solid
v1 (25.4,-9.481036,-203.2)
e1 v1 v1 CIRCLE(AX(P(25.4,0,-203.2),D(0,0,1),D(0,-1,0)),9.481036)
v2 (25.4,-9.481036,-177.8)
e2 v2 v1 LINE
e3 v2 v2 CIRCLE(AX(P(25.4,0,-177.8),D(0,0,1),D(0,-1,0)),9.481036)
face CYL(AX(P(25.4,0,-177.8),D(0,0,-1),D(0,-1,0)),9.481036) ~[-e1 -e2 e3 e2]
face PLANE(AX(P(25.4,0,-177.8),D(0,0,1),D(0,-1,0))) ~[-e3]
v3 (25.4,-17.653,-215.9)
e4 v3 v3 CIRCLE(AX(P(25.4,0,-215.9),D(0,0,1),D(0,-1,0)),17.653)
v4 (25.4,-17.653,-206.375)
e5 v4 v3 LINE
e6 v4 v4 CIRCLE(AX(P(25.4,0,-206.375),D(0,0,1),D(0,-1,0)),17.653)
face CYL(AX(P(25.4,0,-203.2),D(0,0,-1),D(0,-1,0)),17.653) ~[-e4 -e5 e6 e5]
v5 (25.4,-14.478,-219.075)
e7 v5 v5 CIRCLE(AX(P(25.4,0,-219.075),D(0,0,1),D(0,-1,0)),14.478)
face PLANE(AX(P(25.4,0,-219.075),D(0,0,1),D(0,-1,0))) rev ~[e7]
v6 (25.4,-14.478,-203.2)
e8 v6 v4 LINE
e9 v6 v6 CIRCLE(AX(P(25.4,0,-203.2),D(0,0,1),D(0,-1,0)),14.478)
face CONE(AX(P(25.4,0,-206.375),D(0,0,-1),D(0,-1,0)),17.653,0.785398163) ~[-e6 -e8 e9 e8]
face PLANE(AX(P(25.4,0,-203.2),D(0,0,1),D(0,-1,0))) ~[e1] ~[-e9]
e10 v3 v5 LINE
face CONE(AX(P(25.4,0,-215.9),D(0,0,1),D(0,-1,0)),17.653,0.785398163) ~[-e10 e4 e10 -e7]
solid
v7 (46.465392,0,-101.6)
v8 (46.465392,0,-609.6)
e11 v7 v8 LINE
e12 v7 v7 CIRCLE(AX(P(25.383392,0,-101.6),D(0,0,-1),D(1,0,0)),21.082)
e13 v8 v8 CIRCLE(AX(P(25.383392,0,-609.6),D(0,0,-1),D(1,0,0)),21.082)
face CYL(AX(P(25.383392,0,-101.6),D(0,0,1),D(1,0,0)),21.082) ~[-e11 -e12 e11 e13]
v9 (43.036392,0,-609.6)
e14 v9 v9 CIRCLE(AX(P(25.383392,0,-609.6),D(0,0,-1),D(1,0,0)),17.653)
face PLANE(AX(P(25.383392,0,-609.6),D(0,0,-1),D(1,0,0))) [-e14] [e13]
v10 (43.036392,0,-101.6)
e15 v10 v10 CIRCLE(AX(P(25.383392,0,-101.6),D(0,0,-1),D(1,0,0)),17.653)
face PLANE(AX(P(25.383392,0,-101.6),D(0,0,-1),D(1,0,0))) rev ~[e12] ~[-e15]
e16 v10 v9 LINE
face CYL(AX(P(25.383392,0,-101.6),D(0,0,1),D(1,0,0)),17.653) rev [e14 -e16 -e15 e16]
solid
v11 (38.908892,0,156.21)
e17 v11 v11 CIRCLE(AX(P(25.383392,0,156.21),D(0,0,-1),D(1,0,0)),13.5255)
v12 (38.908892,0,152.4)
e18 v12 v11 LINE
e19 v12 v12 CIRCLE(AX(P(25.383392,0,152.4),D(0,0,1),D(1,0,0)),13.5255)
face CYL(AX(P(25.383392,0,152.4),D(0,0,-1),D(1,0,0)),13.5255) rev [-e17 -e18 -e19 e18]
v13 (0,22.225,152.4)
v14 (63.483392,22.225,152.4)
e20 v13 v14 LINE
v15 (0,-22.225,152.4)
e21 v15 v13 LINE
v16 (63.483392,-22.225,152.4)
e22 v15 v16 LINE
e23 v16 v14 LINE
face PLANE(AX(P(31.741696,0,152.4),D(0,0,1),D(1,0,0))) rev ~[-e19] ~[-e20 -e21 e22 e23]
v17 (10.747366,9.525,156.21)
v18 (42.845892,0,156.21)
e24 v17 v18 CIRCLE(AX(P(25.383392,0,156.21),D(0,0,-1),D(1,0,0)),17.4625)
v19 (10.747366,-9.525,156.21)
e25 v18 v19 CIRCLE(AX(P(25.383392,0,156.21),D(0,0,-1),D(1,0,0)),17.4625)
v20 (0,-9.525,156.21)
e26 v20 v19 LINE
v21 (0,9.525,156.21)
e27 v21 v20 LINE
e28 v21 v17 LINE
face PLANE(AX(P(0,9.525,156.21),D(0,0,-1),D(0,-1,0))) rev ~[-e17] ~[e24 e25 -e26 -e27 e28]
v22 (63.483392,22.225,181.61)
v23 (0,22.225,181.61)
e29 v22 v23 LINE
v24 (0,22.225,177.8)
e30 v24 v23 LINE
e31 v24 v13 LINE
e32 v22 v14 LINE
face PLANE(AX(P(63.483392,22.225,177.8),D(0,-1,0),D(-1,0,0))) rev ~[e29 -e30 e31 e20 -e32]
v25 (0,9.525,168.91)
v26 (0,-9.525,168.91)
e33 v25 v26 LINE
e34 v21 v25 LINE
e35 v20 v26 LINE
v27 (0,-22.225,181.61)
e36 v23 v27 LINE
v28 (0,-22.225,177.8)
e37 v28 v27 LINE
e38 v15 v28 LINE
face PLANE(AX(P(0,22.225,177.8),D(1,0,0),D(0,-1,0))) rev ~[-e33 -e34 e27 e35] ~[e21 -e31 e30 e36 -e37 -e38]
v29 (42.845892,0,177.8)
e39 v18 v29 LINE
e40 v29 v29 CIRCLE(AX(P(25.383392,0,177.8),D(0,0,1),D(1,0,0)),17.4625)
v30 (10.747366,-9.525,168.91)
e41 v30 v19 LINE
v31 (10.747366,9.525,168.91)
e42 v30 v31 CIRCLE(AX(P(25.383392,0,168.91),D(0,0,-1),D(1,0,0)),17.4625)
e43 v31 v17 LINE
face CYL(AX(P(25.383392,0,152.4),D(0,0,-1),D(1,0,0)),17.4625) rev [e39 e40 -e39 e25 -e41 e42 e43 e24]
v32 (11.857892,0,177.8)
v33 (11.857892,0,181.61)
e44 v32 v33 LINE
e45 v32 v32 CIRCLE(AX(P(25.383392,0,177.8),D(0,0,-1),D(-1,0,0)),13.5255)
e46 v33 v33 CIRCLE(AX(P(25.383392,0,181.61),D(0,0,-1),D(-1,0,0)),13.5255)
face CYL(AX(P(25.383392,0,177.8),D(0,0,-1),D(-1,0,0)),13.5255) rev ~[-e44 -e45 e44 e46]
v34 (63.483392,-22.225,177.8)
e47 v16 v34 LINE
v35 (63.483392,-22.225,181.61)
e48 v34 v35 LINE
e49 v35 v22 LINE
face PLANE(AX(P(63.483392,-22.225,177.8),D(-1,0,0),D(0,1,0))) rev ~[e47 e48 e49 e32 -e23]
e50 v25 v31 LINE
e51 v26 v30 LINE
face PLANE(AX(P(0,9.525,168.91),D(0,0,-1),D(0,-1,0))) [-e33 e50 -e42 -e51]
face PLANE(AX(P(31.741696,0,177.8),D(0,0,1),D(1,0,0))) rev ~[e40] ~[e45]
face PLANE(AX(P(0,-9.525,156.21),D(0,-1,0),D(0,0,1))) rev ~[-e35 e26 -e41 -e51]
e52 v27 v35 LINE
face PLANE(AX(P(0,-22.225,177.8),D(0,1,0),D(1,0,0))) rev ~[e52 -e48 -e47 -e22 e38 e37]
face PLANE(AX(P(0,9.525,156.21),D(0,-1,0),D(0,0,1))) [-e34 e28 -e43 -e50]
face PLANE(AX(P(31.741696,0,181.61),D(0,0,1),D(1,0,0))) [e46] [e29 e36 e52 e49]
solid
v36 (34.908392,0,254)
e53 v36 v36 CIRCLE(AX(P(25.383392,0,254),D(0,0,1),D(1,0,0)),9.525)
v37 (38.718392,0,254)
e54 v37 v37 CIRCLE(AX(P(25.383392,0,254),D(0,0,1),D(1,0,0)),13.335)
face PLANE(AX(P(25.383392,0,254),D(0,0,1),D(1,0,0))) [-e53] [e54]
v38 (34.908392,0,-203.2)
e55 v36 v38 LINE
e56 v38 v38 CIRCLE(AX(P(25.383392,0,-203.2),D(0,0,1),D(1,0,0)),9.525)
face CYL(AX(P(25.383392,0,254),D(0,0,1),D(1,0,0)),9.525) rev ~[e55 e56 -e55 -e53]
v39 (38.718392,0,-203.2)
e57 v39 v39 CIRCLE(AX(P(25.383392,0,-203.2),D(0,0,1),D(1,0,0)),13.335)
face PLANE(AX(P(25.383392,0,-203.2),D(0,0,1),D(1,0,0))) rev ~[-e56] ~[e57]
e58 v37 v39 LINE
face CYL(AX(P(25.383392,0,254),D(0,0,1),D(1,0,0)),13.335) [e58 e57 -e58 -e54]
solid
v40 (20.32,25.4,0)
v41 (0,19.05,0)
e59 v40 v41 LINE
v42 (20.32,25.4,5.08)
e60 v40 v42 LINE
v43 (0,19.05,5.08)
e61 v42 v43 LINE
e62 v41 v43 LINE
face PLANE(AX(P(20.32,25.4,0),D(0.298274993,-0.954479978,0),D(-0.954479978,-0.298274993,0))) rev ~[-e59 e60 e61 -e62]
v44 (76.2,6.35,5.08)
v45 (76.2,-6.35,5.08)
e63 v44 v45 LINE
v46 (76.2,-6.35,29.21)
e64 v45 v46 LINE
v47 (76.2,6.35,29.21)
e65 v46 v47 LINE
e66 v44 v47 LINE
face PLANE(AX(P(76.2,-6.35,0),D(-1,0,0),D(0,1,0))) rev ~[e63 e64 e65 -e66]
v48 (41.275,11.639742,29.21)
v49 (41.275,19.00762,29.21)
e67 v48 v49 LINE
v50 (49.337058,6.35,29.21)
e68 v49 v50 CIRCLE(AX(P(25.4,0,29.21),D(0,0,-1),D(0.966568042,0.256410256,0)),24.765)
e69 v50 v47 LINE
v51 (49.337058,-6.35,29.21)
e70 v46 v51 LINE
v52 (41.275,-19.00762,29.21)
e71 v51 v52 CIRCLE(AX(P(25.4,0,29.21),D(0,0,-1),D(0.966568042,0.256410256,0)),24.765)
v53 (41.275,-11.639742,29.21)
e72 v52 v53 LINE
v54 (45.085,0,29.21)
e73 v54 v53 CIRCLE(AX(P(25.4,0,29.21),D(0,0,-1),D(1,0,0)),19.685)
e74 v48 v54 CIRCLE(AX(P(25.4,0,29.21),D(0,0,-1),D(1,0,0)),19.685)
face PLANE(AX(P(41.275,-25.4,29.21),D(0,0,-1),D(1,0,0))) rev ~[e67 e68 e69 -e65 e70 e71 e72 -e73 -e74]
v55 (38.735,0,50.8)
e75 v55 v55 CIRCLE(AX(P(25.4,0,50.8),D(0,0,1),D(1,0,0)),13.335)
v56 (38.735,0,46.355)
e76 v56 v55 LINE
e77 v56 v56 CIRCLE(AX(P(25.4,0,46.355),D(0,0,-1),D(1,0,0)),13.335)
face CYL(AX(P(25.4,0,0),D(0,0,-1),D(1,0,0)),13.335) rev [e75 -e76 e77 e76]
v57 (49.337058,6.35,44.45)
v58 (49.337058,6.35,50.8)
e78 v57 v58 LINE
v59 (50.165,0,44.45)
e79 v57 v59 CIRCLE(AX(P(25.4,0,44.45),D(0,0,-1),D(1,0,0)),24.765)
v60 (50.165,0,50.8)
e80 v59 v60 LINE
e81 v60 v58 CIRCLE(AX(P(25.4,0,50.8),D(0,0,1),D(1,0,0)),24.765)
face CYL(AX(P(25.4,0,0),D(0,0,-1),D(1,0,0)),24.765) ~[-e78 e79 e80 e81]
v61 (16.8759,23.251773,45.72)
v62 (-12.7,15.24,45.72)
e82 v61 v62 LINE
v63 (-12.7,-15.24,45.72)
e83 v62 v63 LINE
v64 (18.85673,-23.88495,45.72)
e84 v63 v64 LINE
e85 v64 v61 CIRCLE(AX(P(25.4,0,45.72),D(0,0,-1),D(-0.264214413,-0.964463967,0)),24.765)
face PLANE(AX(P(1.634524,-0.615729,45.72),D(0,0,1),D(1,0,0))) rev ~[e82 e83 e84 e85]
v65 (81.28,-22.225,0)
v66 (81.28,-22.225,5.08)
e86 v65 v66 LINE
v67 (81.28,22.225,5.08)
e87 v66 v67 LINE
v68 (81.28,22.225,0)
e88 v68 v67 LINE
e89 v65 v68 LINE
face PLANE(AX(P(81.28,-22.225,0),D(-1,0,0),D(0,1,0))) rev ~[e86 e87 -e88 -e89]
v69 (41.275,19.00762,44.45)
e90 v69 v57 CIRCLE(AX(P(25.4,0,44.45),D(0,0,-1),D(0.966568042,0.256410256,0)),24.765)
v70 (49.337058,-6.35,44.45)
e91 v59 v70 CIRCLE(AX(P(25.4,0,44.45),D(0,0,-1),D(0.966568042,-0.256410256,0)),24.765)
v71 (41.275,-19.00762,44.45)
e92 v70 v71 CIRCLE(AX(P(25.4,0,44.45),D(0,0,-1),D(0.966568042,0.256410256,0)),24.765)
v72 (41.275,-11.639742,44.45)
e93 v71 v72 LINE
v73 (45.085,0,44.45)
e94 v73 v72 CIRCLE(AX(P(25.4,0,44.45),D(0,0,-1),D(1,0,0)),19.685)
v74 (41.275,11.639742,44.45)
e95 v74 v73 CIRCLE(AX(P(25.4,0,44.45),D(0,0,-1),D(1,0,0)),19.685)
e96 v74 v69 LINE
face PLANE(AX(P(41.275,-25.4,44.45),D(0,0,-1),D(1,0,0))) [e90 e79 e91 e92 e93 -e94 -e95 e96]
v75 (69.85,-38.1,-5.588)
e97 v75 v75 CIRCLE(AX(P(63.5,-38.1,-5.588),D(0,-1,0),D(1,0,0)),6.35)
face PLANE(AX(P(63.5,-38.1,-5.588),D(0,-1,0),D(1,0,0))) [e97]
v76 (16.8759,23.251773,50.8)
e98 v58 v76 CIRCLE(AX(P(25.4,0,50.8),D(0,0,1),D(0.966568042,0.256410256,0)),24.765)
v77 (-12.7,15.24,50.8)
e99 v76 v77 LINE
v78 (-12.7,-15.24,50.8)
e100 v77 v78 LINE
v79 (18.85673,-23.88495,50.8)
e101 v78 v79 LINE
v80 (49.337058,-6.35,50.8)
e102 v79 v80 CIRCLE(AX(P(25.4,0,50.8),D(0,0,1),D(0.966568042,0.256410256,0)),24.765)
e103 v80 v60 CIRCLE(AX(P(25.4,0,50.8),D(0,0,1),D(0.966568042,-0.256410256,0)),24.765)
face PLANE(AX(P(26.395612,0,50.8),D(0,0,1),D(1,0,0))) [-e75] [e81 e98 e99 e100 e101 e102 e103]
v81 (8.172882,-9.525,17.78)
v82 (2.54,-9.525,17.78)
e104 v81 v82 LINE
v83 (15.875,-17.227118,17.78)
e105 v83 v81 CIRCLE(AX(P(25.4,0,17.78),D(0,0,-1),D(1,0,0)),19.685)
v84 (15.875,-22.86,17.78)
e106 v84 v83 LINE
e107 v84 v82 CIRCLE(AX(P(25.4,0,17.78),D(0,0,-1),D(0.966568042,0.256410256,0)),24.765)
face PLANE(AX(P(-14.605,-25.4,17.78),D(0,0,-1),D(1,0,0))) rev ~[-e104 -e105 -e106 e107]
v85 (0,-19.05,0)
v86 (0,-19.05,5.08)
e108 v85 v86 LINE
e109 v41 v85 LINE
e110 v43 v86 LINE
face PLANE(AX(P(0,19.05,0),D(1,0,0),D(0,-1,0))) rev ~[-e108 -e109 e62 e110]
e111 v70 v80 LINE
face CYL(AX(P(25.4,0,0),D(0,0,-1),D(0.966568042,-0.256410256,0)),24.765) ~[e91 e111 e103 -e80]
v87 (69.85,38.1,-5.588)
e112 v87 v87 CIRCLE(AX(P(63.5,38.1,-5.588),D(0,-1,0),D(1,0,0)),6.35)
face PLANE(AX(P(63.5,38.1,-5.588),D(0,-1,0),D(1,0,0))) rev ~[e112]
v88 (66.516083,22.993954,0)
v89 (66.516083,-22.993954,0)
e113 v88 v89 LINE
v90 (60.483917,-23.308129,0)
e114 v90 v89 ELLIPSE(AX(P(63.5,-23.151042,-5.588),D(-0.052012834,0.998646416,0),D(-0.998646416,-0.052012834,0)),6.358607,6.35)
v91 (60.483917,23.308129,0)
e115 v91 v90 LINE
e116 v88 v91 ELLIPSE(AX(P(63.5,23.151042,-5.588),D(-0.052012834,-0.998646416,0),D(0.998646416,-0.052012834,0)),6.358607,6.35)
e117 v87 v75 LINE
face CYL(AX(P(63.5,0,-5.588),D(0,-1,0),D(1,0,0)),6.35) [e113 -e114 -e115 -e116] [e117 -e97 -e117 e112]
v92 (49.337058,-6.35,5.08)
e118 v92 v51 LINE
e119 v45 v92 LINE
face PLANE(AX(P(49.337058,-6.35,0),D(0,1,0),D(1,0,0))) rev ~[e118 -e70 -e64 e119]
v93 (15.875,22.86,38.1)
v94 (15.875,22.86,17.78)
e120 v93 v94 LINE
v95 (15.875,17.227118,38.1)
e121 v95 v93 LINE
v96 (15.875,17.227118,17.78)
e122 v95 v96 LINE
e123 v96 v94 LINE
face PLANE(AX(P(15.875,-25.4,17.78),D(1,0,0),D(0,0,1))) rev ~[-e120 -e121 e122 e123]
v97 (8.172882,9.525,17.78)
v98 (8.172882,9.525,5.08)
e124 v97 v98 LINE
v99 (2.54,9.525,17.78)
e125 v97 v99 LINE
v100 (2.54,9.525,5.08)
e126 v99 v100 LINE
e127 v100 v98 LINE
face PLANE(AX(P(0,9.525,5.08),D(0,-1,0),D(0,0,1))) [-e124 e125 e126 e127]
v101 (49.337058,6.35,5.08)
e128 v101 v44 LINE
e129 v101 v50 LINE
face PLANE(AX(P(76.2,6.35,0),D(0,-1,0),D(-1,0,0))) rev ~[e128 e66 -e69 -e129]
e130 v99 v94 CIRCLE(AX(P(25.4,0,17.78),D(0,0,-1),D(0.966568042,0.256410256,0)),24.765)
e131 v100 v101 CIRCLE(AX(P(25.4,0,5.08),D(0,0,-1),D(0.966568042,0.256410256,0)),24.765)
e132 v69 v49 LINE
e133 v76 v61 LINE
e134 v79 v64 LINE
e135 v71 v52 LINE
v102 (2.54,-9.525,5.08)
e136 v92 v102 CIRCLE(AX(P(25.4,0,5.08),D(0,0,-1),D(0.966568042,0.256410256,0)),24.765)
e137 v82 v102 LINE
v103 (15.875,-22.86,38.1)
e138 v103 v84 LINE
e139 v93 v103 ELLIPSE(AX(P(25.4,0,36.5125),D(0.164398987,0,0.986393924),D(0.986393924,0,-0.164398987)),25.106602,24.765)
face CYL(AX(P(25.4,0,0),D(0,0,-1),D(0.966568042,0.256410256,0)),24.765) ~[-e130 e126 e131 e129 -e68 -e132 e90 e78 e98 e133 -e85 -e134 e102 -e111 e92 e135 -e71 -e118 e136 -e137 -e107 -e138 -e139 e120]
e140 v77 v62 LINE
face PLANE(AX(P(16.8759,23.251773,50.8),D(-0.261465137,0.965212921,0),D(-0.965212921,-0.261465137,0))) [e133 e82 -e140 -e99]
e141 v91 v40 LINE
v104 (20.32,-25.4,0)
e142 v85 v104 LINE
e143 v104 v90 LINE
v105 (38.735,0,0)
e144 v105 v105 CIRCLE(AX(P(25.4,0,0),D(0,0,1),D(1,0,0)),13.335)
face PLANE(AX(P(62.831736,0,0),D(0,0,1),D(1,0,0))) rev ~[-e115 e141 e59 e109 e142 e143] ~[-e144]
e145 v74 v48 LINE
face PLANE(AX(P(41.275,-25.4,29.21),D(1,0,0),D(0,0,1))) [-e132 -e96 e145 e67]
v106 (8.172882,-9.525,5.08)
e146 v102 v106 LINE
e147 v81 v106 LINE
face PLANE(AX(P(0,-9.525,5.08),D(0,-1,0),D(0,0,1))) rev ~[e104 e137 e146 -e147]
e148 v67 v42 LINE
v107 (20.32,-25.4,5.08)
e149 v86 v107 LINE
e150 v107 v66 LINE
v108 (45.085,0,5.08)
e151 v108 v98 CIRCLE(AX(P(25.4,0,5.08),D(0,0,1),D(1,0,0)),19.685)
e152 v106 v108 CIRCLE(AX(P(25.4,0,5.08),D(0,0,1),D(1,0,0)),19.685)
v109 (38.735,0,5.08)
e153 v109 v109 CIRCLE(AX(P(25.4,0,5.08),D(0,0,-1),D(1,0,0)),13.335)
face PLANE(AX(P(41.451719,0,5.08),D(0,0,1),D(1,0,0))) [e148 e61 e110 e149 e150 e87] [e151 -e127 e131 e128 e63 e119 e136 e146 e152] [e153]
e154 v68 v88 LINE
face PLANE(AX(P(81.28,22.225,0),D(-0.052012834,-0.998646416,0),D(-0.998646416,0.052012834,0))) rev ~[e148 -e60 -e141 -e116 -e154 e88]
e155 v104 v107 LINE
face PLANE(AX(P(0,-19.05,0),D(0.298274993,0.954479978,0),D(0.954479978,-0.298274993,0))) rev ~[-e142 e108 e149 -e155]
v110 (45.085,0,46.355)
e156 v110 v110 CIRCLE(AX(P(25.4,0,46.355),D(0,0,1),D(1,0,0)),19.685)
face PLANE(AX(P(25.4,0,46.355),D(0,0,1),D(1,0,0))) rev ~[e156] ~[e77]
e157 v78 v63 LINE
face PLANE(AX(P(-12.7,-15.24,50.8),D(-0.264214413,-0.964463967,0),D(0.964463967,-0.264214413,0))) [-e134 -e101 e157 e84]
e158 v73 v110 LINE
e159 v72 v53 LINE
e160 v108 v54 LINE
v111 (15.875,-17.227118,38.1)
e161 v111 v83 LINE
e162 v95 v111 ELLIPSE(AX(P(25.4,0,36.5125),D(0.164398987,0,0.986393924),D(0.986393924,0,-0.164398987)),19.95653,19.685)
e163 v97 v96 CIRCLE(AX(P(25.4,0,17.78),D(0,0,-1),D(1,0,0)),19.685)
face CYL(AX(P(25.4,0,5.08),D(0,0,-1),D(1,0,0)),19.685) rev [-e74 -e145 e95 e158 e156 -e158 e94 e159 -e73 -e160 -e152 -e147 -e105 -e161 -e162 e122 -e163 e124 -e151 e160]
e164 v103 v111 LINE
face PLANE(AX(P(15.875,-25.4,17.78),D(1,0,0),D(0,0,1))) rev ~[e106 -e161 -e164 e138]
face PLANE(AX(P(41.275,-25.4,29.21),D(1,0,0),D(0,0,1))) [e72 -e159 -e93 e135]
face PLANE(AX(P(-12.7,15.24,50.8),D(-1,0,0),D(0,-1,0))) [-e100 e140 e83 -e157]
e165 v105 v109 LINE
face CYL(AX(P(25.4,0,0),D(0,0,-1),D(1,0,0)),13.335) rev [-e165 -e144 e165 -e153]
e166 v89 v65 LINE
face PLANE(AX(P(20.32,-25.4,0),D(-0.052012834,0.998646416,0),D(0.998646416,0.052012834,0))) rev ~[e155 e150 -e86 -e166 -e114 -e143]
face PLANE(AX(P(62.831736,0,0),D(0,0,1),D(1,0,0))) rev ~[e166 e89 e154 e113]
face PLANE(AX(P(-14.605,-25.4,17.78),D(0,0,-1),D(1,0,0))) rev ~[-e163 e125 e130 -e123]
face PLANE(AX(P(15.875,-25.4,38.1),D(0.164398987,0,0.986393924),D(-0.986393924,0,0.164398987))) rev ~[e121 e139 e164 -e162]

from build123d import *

# Parameters (mm, degrees)
F0_R      = 13.335
F1_DEPTH  = 5.08
F2_DEPTH  = 50.8
F3_DEPTH  = 29.21
F5_DEPTH  = 5.08
F6_R      = 19.685
F7_DEPTH  = 41.275
F9_R      = 13.335
F9_R_2    = 9.525
F10_DEPTH = 457.2
F12_W     = 26.8629424323
F12_H     = 15.24
F13_DEPTH = 50.801
F14_R     = 6.35
F15_DEPTH = 38.1
F16_R     = 7.925577889
F16_R_2   = 6.35
F17_DEPTH = 12.7
F18_W     = 19.05
F18_H     = 19.05
F19_DEPTH = 25.4
F21_R     = 21.082
F21_R_2   = 17.653
F22_DEPTH = 508
F26_SIZE  = 3.175
F28_W     = 63.4833923489
F28_H     = 44.45
F28_R     = 17.4625
F28_R_2   = 13.5255
F29_DEPTH = 3.81
F30_DEPTH = 25.4
F32_DEPTH = 3.81
F33_W     = 19.05
F33_H     = 12.7
F34_DEPTH = 25.4


with BuildPart() as f1:
    # F0 (on Top) → F1 (new body)
    with BuildSketch(Plane.XY):
        Polygon((20.32, 25.4), (0, 19.05), (0, -19.05), (20.32, -25.4), (81.28, -22.225), (81.28, 22.225), align=None)
        with BuildLine():
            ThreePointArc((49.3370575677, -6.35), (0.635, 0), (49.3370575677, 6.35))
            Line((49.3370575677, 6.35), (76.2, 6.35))
            Line((76.2, 6.35), (76.2, -6.35))
            Line((76.2, -6.35), (49.3370575677, -6.35))
        make_face(mode=Mode.SUBTRACT)
        with BuildLine():
            ThreePointArc((49.3370575677, 6.35), (49.9571420941, 3.2018740087), (50.165, 0))
            ThreePointArc((50.165, 0), (49.9571420941, -3.2018740087), (49.3370575677, -6.35))
            Line((49.3370575677, -6.35), (76.2, -6.35))
            Line((76.2, -6.35), (76.2, 6.35))
            Line((76.2, 6.35), (49.3370575677, 6.35))
        make_face()
        with BuildLine():
            ThreePointArc((49.3370575677, -6.35), (49.9571420941, -3.2018740087), (50.165, 0))
            ThreePointArc((50.165, 0), (49.9571420941, 3.2018740087), (49.3370575677, 6.35))
            ThreePointArc((49.3370575677, 6.35), (0.635, 0), (49.3370575677, -6.35))
        make_face()
        with Locations((25.4, 0)):
            Circle(F0_R, mode=Mode.SUBTRACT)
    extrude(amount=F1_DEPTH)

    # F0 (on Top) → F2 (join)
    with BuildSketch(Plane.XY):
        with BuildLine():
            ThreePointArc((49.3370575677, -6.35), (49.9571420941, -3.2018740087), (50.165, 0))
            ThreePointArc((50.165, 0), (49.9571420941, 3.2018740087), (49.3370575677, 6.35))
            ThreePointArc((49.3370575677, 6.35), (0.635, 0), (49.3370575677, -6.35))
        make_face()
        with Locations((25.4, 0)):
            Circle(F0_R, mode=Mode.SUBTRACT)
    extrude(amount=F2_DEPTH)

    # F0 (on Top) → F3 (join)
    with BuildSketch(Plane.XY):
        with BuildLine():
            ThreePointArc((49.3370575677, 6.35), (49.9571420941, 3.2018740087), (50.165, 0))
            ThreePointArc((50.165, 0), (49.9571420941, -3.2018740087), (49.3370575677, -6.35))
            Line((49.3370575677, -6.35), (76.2, -6.35))
            Line((76.2, -6.35), (76.2, 6.35))
            Line((76.2, 6.35), (49.3370575677, 6.35))
        make_face()
    extrude(amount=F3_DEPTH)

    # F4 (on face) → F5 (join)
    with BuildSketch(Plane.XY.offset(50.8)):
        with BuildLine():
            ThreePointArc((18.8567300583, -23.8849501459), (0.6568378159, -1.0397836945), (16.8759001326, 23.2517729743))
            Line((16.8759001326, 23.2517729743), (-12.7, 15.24))
            Line((-12.7, 15.24), (-12.7, -15.24))
            Line((-12.7, -15.24), (18.8567300583, -23.8849501459))
        make_face()
    extrude(amount=-F5_DEPTH)

    # F6 (on face) → F7 (cut)
    with BuildSketch(Plane.XY.offset(5.08)):
        with Locations((25.4, 0)):
            Circle(F6_R)
    extrude(amount=F7_DEPTH, mode=Mode.SUBTRACT)

    # F12 (on offset) → F13 (cut, through all)
    with BuildSketch(Plane.XZ.offset(25.4)):
        Polygon((-14.605, 43.18), (-14.605, 17.78), (15.875, 17.78), (15.875, 38.1), align=None)
        with Locations((54.7064712161, 36.83)):
            Rectangle(F12_W, F12_H)
    extrude(amount=-F13_DEPTH, mode=Mode.SUBTRACT)

    # F14 (on Front) → F15 (join, symmetric)
    with BuildSketch(Plane.XZ):
        with Locations((63.5, -5.588)):
            Circle(F14_R)
    extrude(amount=F15_DEPTH, both=True)

    # F16 (on face) → F17 (cut)
    with BuildSketch(Plane.XZ.offset(38.1)):
        with Locations((63.5, -5.588)):
            Circle(F16_R)
        with Locations((63.5, -5.588)):
            Circle(F16_R_2, mode=Mode.SUBTRACT)
    extrude(amount=-F17_DEPTH, mode=Mode.SUBTRACT)

    # F18 (on Right) → F19 (cut)
    with BuildSketch(Plane.YZ):
        with Locations((0, 14.605)):
            Rectangle(F18_W, F18_H)
    extrude(amount=F19_DEPTH, mode=Mode.SUBTRACT)


with BuildPart() as f10:
    # F9 (on offset) → F10 (new body)
    with BuildSketch(Plane.XY.offset(254)):
        with Locations((25.3833923489, 0)):
            Circle(F9_R)
        with Locations((25.3833923489, 0)):
            Circle(F9_R_2, mode=Mode.SUBTRACT)
    extrude(amount=-F10_DEPTH)


with BuildPart() as f22:
    # F21 (on offset) → F22 (new body)
    with BuildSketch(Plane(origin=(0, 0, -101.6), x_dir=(1, 0, 0), z_dir=(0, 0, -1))):
        with Locations((25.3833923489, 0)):
            Circle(F21_R)
        with Locations((25.3833923489, 0)):
            Circle(F21_R_2, mode=Mode.SUBTRACT)
    extrude(amount=F22_DEPTH)


with BuildPart() as f25:
    # F24 (on plane+point) → F25 (revolve)
    with BuildSketch(Plane.YZ.offset(25.4)):
        Polygon((0, -177.8), (-9.4810361043, -177.8), (-9.4810361043, -203.2), (-17.653, -203.2), (-17.653, -219.075), (0, -219.075), align=None)
    revolve(axis=Axis((25.4, 0, -198.4375), (0, 0, 1)))

    # F26
    f26_edges = [f25.edges().sort_by_distance(p)[0] for p in [
        (25.4, 17.653, -219.075),
        (25.4, 17.653, -203.2),
    ]]
    chamfer(f26_edges, length=F26_SIZE)


with BuildPart() as f29:
    # F28 (on offset) → F29 (new body)
    with BuildSketch(Plane.XY.offset(152.4)):
        with Locations((31.7416961744, 0)):
            Rectangle(F28_W, F28_H)
        with Locations((25.3833923489, 0)):
            Circle(F28_R, mode=Mode.SUBTRACT)
        with Locations((25.3833923489, 0)):
            Circle(F28_R)
        with Locations((25.3833923489, 0)):
            Circle(F28_R_2, mode=Mode.SUBTRACT)
    extrude(amount=F29_DEPTH)

    # F28 (on offset) → F30 (join)
    with BuildSketch(Plane.XY.offset(152.4)):
        with Locations((31.7416961744, 0)):
            Rectangle(F28_W, F28_H)
        with Locations((25.3833923489, 0)):
            Circle(F28_R, mode=Mode.SUBTRACT)
    extrude(amount=F30_DEPTH)

    # F31 (on face) → F32 (join)
    with BuildSketch(Plane.XY.offset(177.8)):
        Polygon((63.4833923489, 22.225), (0, 22.225), (0, 0), (0, -22.225), (63.4833923489, -22.225), align=None)
        with BuildLine():
            ThreePointArc((42.8458923489, 0), (25.3833923489, -17.4625), (7.9208923489, 0))
            ThreePointArc((7.9208923489, 0), (25.3833923489, 17.4625), (42.8458923489, 0))
        make_face(mode=Mode.SUBTRACT)
        with BuildLine():
            ThreePointArc((42.8458923489, 0), (25.3833923489, 17.4625), (7.9208923489, 0))
            ThreePointArc((7.9208923489, 0), (25.3833923489, -17.4625), (42.8458923489, 0))
        make_face()
        with BuildLine():
            ThreePointArc((38.9088923489, 0), (25.3833923489, -13.5255), (11.8578923489, 0))
            ThreePointArc((11.8578923489, 0), (25.3833923489, 13.5255), (38.9088923489, 0))
        make_face(mode=Mode.SUBTRACT)
    extrude(amount=F32_DEPTH)

    # F33 (on face) → F34 (cut)
    with BuildSketch(Plane(origin=(0, 0, 0), x_dir=(0, -1, 0), z_dir=(-1, 0, 0))):
        with Locations((0, 162.56)):
            Rectangle(F33_W, F33_H)
    extrude(amount=-F34_DEPTH, mode=Mode.SUBTRACT)


solid = Compound([f1.part, f10.part, f22.part, f25.part, f29.part])
